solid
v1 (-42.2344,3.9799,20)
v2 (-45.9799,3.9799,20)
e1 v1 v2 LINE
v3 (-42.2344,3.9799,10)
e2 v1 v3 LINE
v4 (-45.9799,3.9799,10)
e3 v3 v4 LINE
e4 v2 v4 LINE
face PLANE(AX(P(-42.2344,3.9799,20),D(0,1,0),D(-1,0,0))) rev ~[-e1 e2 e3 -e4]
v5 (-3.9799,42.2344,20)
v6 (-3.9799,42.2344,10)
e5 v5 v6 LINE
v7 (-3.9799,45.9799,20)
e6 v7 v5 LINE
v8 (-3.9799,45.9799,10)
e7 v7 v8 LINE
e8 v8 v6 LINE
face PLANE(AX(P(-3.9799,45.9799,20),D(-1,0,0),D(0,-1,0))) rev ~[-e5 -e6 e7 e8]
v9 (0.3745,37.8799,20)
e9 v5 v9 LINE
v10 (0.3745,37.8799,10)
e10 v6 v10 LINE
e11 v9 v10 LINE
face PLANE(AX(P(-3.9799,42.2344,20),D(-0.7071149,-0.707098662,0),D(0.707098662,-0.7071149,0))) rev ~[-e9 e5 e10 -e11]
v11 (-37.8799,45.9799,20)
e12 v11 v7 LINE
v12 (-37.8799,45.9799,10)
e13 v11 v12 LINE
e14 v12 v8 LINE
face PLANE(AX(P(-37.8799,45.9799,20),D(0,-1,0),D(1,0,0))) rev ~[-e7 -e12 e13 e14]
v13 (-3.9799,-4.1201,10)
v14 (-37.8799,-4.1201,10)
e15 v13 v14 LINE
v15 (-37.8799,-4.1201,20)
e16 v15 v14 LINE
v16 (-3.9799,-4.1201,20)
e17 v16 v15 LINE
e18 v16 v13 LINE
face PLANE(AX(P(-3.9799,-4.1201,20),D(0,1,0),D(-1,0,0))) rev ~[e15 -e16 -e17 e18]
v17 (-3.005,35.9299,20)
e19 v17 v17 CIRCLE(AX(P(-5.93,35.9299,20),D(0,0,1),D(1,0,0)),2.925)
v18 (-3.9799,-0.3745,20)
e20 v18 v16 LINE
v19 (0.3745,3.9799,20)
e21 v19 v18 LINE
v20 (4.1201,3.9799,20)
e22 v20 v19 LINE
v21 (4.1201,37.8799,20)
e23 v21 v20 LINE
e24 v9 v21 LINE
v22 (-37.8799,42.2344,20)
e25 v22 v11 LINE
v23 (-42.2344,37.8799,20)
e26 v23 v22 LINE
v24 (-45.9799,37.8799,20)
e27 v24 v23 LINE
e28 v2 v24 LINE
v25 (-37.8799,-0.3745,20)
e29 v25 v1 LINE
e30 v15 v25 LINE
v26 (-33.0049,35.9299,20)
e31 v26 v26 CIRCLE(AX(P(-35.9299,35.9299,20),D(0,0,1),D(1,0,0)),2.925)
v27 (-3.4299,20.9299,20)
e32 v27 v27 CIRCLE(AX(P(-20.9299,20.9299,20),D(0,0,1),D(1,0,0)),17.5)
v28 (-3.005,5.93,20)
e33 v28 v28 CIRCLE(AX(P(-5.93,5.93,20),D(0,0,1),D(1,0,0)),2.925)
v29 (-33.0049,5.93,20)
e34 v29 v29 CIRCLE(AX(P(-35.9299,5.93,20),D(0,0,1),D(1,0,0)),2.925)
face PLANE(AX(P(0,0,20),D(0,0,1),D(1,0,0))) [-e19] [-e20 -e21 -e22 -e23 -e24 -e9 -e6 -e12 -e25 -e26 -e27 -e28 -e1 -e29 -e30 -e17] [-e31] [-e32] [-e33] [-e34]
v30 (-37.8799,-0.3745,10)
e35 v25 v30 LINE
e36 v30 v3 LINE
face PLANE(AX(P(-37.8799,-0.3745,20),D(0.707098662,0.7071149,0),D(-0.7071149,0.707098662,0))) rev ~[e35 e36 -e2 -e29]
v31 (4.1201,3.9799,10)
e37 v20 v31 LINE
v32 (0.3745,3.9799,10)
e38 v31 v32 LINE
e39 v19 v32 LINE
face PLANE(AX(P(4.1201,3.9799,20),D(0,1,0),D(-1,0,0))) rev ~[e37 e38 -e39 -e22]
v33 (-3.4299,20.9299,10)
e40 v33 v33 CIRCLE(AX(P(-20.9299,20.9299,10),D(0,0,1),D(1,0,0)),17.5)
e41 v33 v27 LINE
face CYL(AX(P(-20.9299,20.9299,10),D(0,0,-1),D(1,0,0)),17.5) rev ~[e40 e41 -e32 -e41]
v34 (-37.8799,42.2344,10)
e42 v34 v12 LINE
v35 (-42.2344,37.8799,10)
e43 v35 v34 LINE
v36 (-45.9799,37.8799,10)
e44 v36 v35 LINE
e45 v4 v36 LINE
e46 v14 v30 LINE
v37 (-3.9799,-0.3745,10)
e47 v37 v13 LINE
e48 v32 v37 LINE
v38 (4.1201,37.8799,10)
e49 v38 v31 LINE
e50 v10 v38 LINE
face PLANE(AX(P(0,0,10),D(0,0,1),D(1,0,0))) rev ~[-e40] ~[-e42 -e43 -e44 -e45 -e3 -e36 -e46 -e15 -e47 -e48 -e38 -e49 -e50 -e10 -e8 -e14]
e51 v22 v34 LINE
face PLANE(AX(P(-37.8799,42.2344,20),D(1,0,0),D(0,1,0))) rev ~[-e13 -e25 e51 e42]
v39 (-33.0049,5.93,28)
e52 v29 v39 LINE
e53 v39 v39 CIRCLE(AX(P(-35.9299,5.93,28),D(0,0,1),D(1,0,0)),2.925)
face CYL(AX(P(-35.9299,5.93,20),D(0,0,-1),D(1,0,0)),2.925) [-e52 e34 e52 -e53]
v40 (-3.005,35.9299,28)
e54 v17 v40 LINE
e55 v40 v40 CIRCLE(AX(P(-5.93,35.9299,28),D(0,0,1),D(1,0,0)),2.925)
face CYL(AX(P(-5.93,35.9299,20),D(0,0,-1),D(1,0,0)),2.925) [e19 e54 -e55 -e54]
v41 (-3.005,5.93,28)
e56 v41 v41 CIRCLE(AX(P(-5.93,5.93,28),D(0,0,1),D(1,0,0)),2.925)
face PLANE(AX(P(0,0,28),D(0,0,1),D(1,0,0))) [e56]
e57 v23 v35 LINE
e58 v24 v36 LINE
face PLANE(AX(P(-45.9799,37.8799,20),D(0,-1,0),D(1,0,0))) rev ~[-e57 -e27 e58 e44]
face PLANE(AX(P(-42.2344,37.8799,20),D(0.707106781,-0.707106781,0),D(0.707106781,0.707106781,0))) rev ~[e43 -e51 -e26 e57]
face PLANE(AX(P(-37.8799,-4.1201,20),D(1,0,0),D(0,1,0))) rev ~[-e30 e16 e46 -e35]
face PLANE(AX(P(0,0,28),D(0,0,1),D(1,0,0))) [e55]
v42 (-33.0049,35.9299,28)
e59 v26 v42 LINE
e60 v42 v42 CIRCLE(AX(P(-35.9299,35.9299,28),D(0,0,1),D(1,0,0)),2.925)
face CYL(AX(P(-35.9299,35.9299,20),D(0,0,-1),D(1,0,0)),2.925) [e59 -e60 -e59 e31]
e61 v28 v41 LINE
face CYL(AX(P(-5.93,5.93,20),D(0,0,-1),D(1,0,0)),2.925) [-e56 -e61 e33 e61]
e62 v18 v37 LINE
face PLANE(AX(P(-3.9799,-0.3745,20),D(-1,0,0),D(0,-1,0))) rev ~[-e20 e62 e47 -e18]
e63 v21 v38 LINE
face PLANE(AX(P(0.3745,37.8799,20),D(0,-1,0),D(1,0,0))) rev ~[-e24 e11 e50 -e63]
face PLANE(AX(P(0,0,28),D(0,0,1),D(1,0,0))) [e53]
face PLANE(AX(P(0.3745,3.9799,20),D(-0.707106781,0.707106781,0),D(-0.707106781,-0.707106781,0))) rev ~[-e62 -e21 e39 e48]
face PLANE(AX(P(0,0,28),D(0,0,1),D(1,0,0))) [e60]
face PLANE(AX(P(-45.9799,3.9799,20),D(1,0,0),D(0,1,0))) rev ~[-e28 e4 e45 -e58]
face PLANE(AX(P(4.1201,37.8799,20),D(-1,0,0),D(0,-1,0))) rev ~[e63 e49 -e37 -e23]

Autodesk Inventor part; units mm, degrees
ref_plane "YZ Plane" through (0, 0, 0) normal (1, 0, 0) x (0, 1, 0)
ref_plane "XZ Plane" through (0, 0, 0) normal (0, 1, 0) x (-1, 0, 0)
ref_plane "Work Plane1" through (0, 0, 10) normal (0, 0, 1) x (1, 0, 0)
sketch "Sketch1" plane through (0, 0, 10) normal (0, 0, 1) x (1, 0, 0)
  line L0 (-4.0299, -0.3538) -> (-2.2322, 1.4439) construction
  arc A0 (-1.4439, 2.2322) -> (-2.2322, 1.4439) centre (-0.9299, 0.9299) ccw construction
  line L1 (-1.4439, 2.2322) -> (0.3538, 4.0299) construction
  line L2 (-37.8299, 42.8299) -> (-37.8299, 37.8299) construction
  line L3 (-37.8299, 37.8299) -> (-42.9208, 37.8299) construction
  line L4 (-37.8299, 42.2137) -> (-37.8299, 45.8299) construction
  line L5 (-37.8299, 45.8299) -> (-4.0299, 45.8299) construction
  line L6 (-4.0299, 45.8299) -> (-4.0299, 42.2137) construction
  line L7 (-4.0299, 4.0299) -> (0.3538, 4.0299) projected
  circle A1 centre (-20.9299, 20.9299) radius 17.5 projected
  line L8 (-20.9299, 58.9723) -> (17.1124, 20.9299) construction
  line L9 (17.1124, 20.9299) -> (-20.9299, -17.1124) construction
  line L10 (-20.9299, -17.1124) -> (-58.9723, 20.9299) construction
  line L11 (-58.9723, 20.9299) -> (-20.9299, 58.9723) construction
  line L12 (-20.9299, 58.9723) -> (-20.9299, -17.1124) construction
  line L13 (17.1124, 20.9299) -> (-58.9723, 20.9299) construction
  line L14 (-20.9299, 58.9723) -> (32.8701, 58.9723) construction
  line L15 (-43.4299, 43.4299) -> (1.5701, 43.4299) construction
  line L16 (1.5701, 43.4299) -> (1.5701, -1.5701) construction
  line L17 (1.5701, -1.5701) -> (-43.4299, -1.5701) construction
  line L18 (-43.4299, -1.5701) -> (-43.4299, 43.4299) construction
  line L19 (-43.4299, 43.4299) -> (1.5701, -1.5701) construction
  line L20 (1.5701, 43.4299) -> (-43.4299, -1.5701) construction
  line L21 (-43.4299, 5.3876) -> (-43.4299, 36.4723)
  line L22 (-43.4299, 36.4723) -> (-36.4723, 43.4299)
  line L23 (-36.4723, 43.4299) -> (-5.3876, 43.4299)
  line L24 (-5.3876, 43.4299) -> (1.5701, 36.4723)
  line L25 (1.5701, 36.4723) -> (1.5701, 5.3876)
  line L26 (1.5701, 5.3876) -> (-5.3876, -1.5701)
  line L27 (-5.3876, -1.5701) -> (-36.4723, -1.5701)
  line L28 (-36.4723, -1.5701) -> (-43.4299, 5.3876)
  line L29 (-4.0299, 42.2137) -> (-37.8299, 42.2137) projected
  line L30 (-4.0299, -0.3538) -> (-4.0299, 4.0299) projected
  point P0 (-37.8299, 4.0299)
  point P1 (-20.9299, 20.9299)
  dimension "d18" = 53.8
  dimension "d19" = 45
  dimension "d20" = 53.8
  dimension "d21" = 45
  dimension "d22" = 45
extrude "Extrusion1" add sketch "Sketch1" along normal blind 10
sketch "Sketch2" plane through (0, 0, 20) normal (0, 0, 1) x (1, 0, 0)
  circle A0 centre (-35.9299, 35.9299) radius 3.0099 construction
  circle A1 centre (-5.93, 35.9299) radius 3.0099 construction
  circle A2 centre (-5.93, 5.93) radius 3.0099 construction
  circle A3 centre (-35.9299, 5.93) radius 3.0099 construction
  circle A4 centre (-35.9299, 35.9299) radius 2.925
  circle A5 centre (-5.93, 35.9299) radius 2.925
  circle A6 centre (-5.93, 5.93) radius 2.925
  circle A7 centre (-35.9299, 5.93) radius 2.925
  point P0 (0, 0)
  dimension "d1" = 5.85
  dimension "d31" = 5.85
  dimension "d32" = 5.85
  dimension "d33" = 5.85
ref_plane "Work Plane2" through (-40.9959, 0.8639, 22.2359) normal (0, 0, 1) x (1, 0, 0)
extrude "Extrusion2" add sketch "Sketch2" along normal blind 8
sketch "Sketch3" plane through (0, 0, 10) normal (0, 0, -1) x (-1, 0, 0)
  line L0 (37.8299, -0.4701) -> (37.8299, 4.0299) construction
  line L1 (4.0299, 4.0299) -> (4.0299, -0.4701) construction
  line L2 (37.8299, -0.4701) -> (37.8299, 1.1886) construction
  line L3 (4.0299, -3.9701) -> (4.0299, -0.3538) construction
  line L4 (45.8299, 4.0299) -> (42.2137, 4.0299) construction
  line L5 (-0.3538, 4.0299) -> (-3.9701, 4.0299) construction
  line L6 (-3.9701, 37.8299) -> (-0.3538, 37.8299) construction
  line L7 (4.0299, 42.2137) -> (4.0299, 45.8299) construction
  line L8 (37.8299, 45.8299) -> (37.8299, 42.2137) construction
  line L9 (42.2137, 37.8299) -> (45.8299, 37.8299) construction
  line L10 (40.4657, 37.7299) -> (45.8299, 37.7299)
  line L11 (45.8299, 37.7299) -> (45.8299, 4.1299)
  line L12 (45.8299, 4.1299) -> (40.4657, 4.1299)
  line L13 (40.4657, 4.1299) -> (40.4657, 37.7299)
  line L14 (37.7299, 2.4952) -> (4.1299, 2.4952)
  line L15 (4.1299, 2.4952) -> (4.1299, -3.9701)
  line L16 (4.1299, -3.9701) -> (37.7299, -3.9701)
  line L17 (37.7299, -3.9701) -> (37.7299, 2.4952)
  line L18 (1.8946, 4.1299) -> (-3.9701, 4.1299)
  line L19 (-3.9701, 4.1299) -> (-3.9701, 37.7299)
  line L20 (-3.9701, 37.7299) -> (1.8946, 37.7299)
  line L21 (1.8946, 37.7299) -> (1.8946, 4.1299)
  line L22 (4.1299, 40.7326) -> (37.7299, 40.7326)
  line L23 (37.7299, 40.7326) -> (37.7299, 45.8299)
  line L24 (37.7299, 45.8299) -> (4.1299, 45.8299)
  line L25 (4.1299, 45.8299) -> (4.1299, 40.7326)
  point P0 (0, 0)
  dimension "d23" = 0.1
  dimension "d24" = 0.1
  dimension "d25" = 0.1
  dimension "d26" = 0.1
  dimension "d27" = 0.1
extrude "Extrusion3" add sketch "Sketch3" against normal up to surface (10 mm away)
sketch "Sketch4" plane through (0, 0, 20) normal (0, 0, 1) x (1, 0, 0)
  line L0 (3.9701, 4.1299) -> (0.3124, 4.1299) projected
  line L1 (3.9701, 37.7299) -> (3.9701, 4.1299) projected
  line L2 (0.3124, 37.7299) -> (3.9701, 37.7299) projected
  line L3 (0.3124, 37.7299) -> (-4.1299, 42.1723) projected
  line L4 (-4.1299, 45.8299) -> (-4.1299, 42.1723) projected
  line L5 (-37.7299, 45.8299) -> (-4.1299, 45.8299) projected
  line L6 (-37.7299, 42.1723) -> (-37.7299, 45.8299) projected
  line L7 (-37.7299, 42.1723) -> (-42.1723, 37.7299) projected
  line L8 (-45.8299, 37.7299) -> (-42.1723, 37.7299) projected
  line L9 (-45.8299, 4.1299) -> (-45.8299, 37.7299) projected
  line L10 (-42.1723, 4.1299) -> (-45.8299, 4.1299) projected
  line L11 (-42.1723, 4.1299) -> (-37.7299, -0.3124) projected
  line L12 (-37.7299, -3.9701) -> (-37.7299, -0.3124) projected
  line L13 (-4.1299, -3.9701) -> (-37.7299, -3.9701) projected
  line L14 (-4.1299, -0.3124) -> (-4.1299, -3.9701) projected
  line L15 (-4.1299, -0.3124) -> (0.3124, 4.1299) projected
  circle A0 centre (-20.9299, 20.9299) radius 17.5 projected
  circle A1 centre (-35.9299, 5.93) radius 2.925 projected
  circle A2 centre (-5.93, 35.9299) radius 2.925 projected
  circle A3 centre (-35.9299, 35.9299) radius 2.925 projected
  circle A4 centre (-5.93, 5.93) radius 2.925 projected
  line L16 (-3.9799, 45.9799) -> (-3.9799, 42.2344)
  line L17 (-3.9799, 42.2344) -> (0.3745, 37.8799)
  line L18 (0.3745, 37.8799) -> (4.1201, 37.8799)
  line L19 (4.1201, 37.8799) -> (4.1201, 3.9799)
  line L20 (4.1201, 3.9799) -> (0.3745, 3.9799)
  line L21 (0.3745, 3.9799) -> (-3.9799, -0.3745)
  line L22 (-3.9799, -0.3745) -> (-3.9799, -4.1201)
  line L23 (-3.9799, -4.1201) -> (-37.8799, -4.1201)
  line L24 (-37.8799, -4.1201) -> (-37.8799, -0.3745)
  line L25 (-37.8799, -0.3745) -> (-42.2344, 3.9799)
  line L26 (-42.2344, 3.9799) -> (-45.9799, 3.9799)
  line L27 (-45.9799, 3.9799) -> (-45.9799, 37.8799)
  line L28 (-45.9799, 37.8799) -> (-42.2344, 37.8799)
  line L29 (-42.2344, 37.8799) -> (-37.8799, 42.2344)
  line L30 (-37.8799, 42.2344) -> (-37.8799, 45.9799)
  line L31 (-37.8799, 45.9799) -> (-3.9799, 45.9799)
  point P0 (0, 0)
  dimension "d34" = 0.15
extrude "Extrusion4" add sketch "Sketch4" against normal up to surface (10 mm away) contours L16 L17 L18 L19 L20 L21 L22 L23 L24 L25 L26 L27 L28 L29 L30 L31
ref_plane "Arbeitsebene3" through (-37.8799, 20.9299, 20) normal (0, -1, 0) x (1, 0, 0)
ref_plane "Arbeitsebene4" through (-20.9299, 3.9799, 20) normal (1, 0, 0) x (0, 0, -1)
equation "\"d31\" = d1"
equation "\"d32\" = d1"
equation "\"d33\" = d1"
properties part number "20_Cube_Insert_Thorlabs_Pins"
